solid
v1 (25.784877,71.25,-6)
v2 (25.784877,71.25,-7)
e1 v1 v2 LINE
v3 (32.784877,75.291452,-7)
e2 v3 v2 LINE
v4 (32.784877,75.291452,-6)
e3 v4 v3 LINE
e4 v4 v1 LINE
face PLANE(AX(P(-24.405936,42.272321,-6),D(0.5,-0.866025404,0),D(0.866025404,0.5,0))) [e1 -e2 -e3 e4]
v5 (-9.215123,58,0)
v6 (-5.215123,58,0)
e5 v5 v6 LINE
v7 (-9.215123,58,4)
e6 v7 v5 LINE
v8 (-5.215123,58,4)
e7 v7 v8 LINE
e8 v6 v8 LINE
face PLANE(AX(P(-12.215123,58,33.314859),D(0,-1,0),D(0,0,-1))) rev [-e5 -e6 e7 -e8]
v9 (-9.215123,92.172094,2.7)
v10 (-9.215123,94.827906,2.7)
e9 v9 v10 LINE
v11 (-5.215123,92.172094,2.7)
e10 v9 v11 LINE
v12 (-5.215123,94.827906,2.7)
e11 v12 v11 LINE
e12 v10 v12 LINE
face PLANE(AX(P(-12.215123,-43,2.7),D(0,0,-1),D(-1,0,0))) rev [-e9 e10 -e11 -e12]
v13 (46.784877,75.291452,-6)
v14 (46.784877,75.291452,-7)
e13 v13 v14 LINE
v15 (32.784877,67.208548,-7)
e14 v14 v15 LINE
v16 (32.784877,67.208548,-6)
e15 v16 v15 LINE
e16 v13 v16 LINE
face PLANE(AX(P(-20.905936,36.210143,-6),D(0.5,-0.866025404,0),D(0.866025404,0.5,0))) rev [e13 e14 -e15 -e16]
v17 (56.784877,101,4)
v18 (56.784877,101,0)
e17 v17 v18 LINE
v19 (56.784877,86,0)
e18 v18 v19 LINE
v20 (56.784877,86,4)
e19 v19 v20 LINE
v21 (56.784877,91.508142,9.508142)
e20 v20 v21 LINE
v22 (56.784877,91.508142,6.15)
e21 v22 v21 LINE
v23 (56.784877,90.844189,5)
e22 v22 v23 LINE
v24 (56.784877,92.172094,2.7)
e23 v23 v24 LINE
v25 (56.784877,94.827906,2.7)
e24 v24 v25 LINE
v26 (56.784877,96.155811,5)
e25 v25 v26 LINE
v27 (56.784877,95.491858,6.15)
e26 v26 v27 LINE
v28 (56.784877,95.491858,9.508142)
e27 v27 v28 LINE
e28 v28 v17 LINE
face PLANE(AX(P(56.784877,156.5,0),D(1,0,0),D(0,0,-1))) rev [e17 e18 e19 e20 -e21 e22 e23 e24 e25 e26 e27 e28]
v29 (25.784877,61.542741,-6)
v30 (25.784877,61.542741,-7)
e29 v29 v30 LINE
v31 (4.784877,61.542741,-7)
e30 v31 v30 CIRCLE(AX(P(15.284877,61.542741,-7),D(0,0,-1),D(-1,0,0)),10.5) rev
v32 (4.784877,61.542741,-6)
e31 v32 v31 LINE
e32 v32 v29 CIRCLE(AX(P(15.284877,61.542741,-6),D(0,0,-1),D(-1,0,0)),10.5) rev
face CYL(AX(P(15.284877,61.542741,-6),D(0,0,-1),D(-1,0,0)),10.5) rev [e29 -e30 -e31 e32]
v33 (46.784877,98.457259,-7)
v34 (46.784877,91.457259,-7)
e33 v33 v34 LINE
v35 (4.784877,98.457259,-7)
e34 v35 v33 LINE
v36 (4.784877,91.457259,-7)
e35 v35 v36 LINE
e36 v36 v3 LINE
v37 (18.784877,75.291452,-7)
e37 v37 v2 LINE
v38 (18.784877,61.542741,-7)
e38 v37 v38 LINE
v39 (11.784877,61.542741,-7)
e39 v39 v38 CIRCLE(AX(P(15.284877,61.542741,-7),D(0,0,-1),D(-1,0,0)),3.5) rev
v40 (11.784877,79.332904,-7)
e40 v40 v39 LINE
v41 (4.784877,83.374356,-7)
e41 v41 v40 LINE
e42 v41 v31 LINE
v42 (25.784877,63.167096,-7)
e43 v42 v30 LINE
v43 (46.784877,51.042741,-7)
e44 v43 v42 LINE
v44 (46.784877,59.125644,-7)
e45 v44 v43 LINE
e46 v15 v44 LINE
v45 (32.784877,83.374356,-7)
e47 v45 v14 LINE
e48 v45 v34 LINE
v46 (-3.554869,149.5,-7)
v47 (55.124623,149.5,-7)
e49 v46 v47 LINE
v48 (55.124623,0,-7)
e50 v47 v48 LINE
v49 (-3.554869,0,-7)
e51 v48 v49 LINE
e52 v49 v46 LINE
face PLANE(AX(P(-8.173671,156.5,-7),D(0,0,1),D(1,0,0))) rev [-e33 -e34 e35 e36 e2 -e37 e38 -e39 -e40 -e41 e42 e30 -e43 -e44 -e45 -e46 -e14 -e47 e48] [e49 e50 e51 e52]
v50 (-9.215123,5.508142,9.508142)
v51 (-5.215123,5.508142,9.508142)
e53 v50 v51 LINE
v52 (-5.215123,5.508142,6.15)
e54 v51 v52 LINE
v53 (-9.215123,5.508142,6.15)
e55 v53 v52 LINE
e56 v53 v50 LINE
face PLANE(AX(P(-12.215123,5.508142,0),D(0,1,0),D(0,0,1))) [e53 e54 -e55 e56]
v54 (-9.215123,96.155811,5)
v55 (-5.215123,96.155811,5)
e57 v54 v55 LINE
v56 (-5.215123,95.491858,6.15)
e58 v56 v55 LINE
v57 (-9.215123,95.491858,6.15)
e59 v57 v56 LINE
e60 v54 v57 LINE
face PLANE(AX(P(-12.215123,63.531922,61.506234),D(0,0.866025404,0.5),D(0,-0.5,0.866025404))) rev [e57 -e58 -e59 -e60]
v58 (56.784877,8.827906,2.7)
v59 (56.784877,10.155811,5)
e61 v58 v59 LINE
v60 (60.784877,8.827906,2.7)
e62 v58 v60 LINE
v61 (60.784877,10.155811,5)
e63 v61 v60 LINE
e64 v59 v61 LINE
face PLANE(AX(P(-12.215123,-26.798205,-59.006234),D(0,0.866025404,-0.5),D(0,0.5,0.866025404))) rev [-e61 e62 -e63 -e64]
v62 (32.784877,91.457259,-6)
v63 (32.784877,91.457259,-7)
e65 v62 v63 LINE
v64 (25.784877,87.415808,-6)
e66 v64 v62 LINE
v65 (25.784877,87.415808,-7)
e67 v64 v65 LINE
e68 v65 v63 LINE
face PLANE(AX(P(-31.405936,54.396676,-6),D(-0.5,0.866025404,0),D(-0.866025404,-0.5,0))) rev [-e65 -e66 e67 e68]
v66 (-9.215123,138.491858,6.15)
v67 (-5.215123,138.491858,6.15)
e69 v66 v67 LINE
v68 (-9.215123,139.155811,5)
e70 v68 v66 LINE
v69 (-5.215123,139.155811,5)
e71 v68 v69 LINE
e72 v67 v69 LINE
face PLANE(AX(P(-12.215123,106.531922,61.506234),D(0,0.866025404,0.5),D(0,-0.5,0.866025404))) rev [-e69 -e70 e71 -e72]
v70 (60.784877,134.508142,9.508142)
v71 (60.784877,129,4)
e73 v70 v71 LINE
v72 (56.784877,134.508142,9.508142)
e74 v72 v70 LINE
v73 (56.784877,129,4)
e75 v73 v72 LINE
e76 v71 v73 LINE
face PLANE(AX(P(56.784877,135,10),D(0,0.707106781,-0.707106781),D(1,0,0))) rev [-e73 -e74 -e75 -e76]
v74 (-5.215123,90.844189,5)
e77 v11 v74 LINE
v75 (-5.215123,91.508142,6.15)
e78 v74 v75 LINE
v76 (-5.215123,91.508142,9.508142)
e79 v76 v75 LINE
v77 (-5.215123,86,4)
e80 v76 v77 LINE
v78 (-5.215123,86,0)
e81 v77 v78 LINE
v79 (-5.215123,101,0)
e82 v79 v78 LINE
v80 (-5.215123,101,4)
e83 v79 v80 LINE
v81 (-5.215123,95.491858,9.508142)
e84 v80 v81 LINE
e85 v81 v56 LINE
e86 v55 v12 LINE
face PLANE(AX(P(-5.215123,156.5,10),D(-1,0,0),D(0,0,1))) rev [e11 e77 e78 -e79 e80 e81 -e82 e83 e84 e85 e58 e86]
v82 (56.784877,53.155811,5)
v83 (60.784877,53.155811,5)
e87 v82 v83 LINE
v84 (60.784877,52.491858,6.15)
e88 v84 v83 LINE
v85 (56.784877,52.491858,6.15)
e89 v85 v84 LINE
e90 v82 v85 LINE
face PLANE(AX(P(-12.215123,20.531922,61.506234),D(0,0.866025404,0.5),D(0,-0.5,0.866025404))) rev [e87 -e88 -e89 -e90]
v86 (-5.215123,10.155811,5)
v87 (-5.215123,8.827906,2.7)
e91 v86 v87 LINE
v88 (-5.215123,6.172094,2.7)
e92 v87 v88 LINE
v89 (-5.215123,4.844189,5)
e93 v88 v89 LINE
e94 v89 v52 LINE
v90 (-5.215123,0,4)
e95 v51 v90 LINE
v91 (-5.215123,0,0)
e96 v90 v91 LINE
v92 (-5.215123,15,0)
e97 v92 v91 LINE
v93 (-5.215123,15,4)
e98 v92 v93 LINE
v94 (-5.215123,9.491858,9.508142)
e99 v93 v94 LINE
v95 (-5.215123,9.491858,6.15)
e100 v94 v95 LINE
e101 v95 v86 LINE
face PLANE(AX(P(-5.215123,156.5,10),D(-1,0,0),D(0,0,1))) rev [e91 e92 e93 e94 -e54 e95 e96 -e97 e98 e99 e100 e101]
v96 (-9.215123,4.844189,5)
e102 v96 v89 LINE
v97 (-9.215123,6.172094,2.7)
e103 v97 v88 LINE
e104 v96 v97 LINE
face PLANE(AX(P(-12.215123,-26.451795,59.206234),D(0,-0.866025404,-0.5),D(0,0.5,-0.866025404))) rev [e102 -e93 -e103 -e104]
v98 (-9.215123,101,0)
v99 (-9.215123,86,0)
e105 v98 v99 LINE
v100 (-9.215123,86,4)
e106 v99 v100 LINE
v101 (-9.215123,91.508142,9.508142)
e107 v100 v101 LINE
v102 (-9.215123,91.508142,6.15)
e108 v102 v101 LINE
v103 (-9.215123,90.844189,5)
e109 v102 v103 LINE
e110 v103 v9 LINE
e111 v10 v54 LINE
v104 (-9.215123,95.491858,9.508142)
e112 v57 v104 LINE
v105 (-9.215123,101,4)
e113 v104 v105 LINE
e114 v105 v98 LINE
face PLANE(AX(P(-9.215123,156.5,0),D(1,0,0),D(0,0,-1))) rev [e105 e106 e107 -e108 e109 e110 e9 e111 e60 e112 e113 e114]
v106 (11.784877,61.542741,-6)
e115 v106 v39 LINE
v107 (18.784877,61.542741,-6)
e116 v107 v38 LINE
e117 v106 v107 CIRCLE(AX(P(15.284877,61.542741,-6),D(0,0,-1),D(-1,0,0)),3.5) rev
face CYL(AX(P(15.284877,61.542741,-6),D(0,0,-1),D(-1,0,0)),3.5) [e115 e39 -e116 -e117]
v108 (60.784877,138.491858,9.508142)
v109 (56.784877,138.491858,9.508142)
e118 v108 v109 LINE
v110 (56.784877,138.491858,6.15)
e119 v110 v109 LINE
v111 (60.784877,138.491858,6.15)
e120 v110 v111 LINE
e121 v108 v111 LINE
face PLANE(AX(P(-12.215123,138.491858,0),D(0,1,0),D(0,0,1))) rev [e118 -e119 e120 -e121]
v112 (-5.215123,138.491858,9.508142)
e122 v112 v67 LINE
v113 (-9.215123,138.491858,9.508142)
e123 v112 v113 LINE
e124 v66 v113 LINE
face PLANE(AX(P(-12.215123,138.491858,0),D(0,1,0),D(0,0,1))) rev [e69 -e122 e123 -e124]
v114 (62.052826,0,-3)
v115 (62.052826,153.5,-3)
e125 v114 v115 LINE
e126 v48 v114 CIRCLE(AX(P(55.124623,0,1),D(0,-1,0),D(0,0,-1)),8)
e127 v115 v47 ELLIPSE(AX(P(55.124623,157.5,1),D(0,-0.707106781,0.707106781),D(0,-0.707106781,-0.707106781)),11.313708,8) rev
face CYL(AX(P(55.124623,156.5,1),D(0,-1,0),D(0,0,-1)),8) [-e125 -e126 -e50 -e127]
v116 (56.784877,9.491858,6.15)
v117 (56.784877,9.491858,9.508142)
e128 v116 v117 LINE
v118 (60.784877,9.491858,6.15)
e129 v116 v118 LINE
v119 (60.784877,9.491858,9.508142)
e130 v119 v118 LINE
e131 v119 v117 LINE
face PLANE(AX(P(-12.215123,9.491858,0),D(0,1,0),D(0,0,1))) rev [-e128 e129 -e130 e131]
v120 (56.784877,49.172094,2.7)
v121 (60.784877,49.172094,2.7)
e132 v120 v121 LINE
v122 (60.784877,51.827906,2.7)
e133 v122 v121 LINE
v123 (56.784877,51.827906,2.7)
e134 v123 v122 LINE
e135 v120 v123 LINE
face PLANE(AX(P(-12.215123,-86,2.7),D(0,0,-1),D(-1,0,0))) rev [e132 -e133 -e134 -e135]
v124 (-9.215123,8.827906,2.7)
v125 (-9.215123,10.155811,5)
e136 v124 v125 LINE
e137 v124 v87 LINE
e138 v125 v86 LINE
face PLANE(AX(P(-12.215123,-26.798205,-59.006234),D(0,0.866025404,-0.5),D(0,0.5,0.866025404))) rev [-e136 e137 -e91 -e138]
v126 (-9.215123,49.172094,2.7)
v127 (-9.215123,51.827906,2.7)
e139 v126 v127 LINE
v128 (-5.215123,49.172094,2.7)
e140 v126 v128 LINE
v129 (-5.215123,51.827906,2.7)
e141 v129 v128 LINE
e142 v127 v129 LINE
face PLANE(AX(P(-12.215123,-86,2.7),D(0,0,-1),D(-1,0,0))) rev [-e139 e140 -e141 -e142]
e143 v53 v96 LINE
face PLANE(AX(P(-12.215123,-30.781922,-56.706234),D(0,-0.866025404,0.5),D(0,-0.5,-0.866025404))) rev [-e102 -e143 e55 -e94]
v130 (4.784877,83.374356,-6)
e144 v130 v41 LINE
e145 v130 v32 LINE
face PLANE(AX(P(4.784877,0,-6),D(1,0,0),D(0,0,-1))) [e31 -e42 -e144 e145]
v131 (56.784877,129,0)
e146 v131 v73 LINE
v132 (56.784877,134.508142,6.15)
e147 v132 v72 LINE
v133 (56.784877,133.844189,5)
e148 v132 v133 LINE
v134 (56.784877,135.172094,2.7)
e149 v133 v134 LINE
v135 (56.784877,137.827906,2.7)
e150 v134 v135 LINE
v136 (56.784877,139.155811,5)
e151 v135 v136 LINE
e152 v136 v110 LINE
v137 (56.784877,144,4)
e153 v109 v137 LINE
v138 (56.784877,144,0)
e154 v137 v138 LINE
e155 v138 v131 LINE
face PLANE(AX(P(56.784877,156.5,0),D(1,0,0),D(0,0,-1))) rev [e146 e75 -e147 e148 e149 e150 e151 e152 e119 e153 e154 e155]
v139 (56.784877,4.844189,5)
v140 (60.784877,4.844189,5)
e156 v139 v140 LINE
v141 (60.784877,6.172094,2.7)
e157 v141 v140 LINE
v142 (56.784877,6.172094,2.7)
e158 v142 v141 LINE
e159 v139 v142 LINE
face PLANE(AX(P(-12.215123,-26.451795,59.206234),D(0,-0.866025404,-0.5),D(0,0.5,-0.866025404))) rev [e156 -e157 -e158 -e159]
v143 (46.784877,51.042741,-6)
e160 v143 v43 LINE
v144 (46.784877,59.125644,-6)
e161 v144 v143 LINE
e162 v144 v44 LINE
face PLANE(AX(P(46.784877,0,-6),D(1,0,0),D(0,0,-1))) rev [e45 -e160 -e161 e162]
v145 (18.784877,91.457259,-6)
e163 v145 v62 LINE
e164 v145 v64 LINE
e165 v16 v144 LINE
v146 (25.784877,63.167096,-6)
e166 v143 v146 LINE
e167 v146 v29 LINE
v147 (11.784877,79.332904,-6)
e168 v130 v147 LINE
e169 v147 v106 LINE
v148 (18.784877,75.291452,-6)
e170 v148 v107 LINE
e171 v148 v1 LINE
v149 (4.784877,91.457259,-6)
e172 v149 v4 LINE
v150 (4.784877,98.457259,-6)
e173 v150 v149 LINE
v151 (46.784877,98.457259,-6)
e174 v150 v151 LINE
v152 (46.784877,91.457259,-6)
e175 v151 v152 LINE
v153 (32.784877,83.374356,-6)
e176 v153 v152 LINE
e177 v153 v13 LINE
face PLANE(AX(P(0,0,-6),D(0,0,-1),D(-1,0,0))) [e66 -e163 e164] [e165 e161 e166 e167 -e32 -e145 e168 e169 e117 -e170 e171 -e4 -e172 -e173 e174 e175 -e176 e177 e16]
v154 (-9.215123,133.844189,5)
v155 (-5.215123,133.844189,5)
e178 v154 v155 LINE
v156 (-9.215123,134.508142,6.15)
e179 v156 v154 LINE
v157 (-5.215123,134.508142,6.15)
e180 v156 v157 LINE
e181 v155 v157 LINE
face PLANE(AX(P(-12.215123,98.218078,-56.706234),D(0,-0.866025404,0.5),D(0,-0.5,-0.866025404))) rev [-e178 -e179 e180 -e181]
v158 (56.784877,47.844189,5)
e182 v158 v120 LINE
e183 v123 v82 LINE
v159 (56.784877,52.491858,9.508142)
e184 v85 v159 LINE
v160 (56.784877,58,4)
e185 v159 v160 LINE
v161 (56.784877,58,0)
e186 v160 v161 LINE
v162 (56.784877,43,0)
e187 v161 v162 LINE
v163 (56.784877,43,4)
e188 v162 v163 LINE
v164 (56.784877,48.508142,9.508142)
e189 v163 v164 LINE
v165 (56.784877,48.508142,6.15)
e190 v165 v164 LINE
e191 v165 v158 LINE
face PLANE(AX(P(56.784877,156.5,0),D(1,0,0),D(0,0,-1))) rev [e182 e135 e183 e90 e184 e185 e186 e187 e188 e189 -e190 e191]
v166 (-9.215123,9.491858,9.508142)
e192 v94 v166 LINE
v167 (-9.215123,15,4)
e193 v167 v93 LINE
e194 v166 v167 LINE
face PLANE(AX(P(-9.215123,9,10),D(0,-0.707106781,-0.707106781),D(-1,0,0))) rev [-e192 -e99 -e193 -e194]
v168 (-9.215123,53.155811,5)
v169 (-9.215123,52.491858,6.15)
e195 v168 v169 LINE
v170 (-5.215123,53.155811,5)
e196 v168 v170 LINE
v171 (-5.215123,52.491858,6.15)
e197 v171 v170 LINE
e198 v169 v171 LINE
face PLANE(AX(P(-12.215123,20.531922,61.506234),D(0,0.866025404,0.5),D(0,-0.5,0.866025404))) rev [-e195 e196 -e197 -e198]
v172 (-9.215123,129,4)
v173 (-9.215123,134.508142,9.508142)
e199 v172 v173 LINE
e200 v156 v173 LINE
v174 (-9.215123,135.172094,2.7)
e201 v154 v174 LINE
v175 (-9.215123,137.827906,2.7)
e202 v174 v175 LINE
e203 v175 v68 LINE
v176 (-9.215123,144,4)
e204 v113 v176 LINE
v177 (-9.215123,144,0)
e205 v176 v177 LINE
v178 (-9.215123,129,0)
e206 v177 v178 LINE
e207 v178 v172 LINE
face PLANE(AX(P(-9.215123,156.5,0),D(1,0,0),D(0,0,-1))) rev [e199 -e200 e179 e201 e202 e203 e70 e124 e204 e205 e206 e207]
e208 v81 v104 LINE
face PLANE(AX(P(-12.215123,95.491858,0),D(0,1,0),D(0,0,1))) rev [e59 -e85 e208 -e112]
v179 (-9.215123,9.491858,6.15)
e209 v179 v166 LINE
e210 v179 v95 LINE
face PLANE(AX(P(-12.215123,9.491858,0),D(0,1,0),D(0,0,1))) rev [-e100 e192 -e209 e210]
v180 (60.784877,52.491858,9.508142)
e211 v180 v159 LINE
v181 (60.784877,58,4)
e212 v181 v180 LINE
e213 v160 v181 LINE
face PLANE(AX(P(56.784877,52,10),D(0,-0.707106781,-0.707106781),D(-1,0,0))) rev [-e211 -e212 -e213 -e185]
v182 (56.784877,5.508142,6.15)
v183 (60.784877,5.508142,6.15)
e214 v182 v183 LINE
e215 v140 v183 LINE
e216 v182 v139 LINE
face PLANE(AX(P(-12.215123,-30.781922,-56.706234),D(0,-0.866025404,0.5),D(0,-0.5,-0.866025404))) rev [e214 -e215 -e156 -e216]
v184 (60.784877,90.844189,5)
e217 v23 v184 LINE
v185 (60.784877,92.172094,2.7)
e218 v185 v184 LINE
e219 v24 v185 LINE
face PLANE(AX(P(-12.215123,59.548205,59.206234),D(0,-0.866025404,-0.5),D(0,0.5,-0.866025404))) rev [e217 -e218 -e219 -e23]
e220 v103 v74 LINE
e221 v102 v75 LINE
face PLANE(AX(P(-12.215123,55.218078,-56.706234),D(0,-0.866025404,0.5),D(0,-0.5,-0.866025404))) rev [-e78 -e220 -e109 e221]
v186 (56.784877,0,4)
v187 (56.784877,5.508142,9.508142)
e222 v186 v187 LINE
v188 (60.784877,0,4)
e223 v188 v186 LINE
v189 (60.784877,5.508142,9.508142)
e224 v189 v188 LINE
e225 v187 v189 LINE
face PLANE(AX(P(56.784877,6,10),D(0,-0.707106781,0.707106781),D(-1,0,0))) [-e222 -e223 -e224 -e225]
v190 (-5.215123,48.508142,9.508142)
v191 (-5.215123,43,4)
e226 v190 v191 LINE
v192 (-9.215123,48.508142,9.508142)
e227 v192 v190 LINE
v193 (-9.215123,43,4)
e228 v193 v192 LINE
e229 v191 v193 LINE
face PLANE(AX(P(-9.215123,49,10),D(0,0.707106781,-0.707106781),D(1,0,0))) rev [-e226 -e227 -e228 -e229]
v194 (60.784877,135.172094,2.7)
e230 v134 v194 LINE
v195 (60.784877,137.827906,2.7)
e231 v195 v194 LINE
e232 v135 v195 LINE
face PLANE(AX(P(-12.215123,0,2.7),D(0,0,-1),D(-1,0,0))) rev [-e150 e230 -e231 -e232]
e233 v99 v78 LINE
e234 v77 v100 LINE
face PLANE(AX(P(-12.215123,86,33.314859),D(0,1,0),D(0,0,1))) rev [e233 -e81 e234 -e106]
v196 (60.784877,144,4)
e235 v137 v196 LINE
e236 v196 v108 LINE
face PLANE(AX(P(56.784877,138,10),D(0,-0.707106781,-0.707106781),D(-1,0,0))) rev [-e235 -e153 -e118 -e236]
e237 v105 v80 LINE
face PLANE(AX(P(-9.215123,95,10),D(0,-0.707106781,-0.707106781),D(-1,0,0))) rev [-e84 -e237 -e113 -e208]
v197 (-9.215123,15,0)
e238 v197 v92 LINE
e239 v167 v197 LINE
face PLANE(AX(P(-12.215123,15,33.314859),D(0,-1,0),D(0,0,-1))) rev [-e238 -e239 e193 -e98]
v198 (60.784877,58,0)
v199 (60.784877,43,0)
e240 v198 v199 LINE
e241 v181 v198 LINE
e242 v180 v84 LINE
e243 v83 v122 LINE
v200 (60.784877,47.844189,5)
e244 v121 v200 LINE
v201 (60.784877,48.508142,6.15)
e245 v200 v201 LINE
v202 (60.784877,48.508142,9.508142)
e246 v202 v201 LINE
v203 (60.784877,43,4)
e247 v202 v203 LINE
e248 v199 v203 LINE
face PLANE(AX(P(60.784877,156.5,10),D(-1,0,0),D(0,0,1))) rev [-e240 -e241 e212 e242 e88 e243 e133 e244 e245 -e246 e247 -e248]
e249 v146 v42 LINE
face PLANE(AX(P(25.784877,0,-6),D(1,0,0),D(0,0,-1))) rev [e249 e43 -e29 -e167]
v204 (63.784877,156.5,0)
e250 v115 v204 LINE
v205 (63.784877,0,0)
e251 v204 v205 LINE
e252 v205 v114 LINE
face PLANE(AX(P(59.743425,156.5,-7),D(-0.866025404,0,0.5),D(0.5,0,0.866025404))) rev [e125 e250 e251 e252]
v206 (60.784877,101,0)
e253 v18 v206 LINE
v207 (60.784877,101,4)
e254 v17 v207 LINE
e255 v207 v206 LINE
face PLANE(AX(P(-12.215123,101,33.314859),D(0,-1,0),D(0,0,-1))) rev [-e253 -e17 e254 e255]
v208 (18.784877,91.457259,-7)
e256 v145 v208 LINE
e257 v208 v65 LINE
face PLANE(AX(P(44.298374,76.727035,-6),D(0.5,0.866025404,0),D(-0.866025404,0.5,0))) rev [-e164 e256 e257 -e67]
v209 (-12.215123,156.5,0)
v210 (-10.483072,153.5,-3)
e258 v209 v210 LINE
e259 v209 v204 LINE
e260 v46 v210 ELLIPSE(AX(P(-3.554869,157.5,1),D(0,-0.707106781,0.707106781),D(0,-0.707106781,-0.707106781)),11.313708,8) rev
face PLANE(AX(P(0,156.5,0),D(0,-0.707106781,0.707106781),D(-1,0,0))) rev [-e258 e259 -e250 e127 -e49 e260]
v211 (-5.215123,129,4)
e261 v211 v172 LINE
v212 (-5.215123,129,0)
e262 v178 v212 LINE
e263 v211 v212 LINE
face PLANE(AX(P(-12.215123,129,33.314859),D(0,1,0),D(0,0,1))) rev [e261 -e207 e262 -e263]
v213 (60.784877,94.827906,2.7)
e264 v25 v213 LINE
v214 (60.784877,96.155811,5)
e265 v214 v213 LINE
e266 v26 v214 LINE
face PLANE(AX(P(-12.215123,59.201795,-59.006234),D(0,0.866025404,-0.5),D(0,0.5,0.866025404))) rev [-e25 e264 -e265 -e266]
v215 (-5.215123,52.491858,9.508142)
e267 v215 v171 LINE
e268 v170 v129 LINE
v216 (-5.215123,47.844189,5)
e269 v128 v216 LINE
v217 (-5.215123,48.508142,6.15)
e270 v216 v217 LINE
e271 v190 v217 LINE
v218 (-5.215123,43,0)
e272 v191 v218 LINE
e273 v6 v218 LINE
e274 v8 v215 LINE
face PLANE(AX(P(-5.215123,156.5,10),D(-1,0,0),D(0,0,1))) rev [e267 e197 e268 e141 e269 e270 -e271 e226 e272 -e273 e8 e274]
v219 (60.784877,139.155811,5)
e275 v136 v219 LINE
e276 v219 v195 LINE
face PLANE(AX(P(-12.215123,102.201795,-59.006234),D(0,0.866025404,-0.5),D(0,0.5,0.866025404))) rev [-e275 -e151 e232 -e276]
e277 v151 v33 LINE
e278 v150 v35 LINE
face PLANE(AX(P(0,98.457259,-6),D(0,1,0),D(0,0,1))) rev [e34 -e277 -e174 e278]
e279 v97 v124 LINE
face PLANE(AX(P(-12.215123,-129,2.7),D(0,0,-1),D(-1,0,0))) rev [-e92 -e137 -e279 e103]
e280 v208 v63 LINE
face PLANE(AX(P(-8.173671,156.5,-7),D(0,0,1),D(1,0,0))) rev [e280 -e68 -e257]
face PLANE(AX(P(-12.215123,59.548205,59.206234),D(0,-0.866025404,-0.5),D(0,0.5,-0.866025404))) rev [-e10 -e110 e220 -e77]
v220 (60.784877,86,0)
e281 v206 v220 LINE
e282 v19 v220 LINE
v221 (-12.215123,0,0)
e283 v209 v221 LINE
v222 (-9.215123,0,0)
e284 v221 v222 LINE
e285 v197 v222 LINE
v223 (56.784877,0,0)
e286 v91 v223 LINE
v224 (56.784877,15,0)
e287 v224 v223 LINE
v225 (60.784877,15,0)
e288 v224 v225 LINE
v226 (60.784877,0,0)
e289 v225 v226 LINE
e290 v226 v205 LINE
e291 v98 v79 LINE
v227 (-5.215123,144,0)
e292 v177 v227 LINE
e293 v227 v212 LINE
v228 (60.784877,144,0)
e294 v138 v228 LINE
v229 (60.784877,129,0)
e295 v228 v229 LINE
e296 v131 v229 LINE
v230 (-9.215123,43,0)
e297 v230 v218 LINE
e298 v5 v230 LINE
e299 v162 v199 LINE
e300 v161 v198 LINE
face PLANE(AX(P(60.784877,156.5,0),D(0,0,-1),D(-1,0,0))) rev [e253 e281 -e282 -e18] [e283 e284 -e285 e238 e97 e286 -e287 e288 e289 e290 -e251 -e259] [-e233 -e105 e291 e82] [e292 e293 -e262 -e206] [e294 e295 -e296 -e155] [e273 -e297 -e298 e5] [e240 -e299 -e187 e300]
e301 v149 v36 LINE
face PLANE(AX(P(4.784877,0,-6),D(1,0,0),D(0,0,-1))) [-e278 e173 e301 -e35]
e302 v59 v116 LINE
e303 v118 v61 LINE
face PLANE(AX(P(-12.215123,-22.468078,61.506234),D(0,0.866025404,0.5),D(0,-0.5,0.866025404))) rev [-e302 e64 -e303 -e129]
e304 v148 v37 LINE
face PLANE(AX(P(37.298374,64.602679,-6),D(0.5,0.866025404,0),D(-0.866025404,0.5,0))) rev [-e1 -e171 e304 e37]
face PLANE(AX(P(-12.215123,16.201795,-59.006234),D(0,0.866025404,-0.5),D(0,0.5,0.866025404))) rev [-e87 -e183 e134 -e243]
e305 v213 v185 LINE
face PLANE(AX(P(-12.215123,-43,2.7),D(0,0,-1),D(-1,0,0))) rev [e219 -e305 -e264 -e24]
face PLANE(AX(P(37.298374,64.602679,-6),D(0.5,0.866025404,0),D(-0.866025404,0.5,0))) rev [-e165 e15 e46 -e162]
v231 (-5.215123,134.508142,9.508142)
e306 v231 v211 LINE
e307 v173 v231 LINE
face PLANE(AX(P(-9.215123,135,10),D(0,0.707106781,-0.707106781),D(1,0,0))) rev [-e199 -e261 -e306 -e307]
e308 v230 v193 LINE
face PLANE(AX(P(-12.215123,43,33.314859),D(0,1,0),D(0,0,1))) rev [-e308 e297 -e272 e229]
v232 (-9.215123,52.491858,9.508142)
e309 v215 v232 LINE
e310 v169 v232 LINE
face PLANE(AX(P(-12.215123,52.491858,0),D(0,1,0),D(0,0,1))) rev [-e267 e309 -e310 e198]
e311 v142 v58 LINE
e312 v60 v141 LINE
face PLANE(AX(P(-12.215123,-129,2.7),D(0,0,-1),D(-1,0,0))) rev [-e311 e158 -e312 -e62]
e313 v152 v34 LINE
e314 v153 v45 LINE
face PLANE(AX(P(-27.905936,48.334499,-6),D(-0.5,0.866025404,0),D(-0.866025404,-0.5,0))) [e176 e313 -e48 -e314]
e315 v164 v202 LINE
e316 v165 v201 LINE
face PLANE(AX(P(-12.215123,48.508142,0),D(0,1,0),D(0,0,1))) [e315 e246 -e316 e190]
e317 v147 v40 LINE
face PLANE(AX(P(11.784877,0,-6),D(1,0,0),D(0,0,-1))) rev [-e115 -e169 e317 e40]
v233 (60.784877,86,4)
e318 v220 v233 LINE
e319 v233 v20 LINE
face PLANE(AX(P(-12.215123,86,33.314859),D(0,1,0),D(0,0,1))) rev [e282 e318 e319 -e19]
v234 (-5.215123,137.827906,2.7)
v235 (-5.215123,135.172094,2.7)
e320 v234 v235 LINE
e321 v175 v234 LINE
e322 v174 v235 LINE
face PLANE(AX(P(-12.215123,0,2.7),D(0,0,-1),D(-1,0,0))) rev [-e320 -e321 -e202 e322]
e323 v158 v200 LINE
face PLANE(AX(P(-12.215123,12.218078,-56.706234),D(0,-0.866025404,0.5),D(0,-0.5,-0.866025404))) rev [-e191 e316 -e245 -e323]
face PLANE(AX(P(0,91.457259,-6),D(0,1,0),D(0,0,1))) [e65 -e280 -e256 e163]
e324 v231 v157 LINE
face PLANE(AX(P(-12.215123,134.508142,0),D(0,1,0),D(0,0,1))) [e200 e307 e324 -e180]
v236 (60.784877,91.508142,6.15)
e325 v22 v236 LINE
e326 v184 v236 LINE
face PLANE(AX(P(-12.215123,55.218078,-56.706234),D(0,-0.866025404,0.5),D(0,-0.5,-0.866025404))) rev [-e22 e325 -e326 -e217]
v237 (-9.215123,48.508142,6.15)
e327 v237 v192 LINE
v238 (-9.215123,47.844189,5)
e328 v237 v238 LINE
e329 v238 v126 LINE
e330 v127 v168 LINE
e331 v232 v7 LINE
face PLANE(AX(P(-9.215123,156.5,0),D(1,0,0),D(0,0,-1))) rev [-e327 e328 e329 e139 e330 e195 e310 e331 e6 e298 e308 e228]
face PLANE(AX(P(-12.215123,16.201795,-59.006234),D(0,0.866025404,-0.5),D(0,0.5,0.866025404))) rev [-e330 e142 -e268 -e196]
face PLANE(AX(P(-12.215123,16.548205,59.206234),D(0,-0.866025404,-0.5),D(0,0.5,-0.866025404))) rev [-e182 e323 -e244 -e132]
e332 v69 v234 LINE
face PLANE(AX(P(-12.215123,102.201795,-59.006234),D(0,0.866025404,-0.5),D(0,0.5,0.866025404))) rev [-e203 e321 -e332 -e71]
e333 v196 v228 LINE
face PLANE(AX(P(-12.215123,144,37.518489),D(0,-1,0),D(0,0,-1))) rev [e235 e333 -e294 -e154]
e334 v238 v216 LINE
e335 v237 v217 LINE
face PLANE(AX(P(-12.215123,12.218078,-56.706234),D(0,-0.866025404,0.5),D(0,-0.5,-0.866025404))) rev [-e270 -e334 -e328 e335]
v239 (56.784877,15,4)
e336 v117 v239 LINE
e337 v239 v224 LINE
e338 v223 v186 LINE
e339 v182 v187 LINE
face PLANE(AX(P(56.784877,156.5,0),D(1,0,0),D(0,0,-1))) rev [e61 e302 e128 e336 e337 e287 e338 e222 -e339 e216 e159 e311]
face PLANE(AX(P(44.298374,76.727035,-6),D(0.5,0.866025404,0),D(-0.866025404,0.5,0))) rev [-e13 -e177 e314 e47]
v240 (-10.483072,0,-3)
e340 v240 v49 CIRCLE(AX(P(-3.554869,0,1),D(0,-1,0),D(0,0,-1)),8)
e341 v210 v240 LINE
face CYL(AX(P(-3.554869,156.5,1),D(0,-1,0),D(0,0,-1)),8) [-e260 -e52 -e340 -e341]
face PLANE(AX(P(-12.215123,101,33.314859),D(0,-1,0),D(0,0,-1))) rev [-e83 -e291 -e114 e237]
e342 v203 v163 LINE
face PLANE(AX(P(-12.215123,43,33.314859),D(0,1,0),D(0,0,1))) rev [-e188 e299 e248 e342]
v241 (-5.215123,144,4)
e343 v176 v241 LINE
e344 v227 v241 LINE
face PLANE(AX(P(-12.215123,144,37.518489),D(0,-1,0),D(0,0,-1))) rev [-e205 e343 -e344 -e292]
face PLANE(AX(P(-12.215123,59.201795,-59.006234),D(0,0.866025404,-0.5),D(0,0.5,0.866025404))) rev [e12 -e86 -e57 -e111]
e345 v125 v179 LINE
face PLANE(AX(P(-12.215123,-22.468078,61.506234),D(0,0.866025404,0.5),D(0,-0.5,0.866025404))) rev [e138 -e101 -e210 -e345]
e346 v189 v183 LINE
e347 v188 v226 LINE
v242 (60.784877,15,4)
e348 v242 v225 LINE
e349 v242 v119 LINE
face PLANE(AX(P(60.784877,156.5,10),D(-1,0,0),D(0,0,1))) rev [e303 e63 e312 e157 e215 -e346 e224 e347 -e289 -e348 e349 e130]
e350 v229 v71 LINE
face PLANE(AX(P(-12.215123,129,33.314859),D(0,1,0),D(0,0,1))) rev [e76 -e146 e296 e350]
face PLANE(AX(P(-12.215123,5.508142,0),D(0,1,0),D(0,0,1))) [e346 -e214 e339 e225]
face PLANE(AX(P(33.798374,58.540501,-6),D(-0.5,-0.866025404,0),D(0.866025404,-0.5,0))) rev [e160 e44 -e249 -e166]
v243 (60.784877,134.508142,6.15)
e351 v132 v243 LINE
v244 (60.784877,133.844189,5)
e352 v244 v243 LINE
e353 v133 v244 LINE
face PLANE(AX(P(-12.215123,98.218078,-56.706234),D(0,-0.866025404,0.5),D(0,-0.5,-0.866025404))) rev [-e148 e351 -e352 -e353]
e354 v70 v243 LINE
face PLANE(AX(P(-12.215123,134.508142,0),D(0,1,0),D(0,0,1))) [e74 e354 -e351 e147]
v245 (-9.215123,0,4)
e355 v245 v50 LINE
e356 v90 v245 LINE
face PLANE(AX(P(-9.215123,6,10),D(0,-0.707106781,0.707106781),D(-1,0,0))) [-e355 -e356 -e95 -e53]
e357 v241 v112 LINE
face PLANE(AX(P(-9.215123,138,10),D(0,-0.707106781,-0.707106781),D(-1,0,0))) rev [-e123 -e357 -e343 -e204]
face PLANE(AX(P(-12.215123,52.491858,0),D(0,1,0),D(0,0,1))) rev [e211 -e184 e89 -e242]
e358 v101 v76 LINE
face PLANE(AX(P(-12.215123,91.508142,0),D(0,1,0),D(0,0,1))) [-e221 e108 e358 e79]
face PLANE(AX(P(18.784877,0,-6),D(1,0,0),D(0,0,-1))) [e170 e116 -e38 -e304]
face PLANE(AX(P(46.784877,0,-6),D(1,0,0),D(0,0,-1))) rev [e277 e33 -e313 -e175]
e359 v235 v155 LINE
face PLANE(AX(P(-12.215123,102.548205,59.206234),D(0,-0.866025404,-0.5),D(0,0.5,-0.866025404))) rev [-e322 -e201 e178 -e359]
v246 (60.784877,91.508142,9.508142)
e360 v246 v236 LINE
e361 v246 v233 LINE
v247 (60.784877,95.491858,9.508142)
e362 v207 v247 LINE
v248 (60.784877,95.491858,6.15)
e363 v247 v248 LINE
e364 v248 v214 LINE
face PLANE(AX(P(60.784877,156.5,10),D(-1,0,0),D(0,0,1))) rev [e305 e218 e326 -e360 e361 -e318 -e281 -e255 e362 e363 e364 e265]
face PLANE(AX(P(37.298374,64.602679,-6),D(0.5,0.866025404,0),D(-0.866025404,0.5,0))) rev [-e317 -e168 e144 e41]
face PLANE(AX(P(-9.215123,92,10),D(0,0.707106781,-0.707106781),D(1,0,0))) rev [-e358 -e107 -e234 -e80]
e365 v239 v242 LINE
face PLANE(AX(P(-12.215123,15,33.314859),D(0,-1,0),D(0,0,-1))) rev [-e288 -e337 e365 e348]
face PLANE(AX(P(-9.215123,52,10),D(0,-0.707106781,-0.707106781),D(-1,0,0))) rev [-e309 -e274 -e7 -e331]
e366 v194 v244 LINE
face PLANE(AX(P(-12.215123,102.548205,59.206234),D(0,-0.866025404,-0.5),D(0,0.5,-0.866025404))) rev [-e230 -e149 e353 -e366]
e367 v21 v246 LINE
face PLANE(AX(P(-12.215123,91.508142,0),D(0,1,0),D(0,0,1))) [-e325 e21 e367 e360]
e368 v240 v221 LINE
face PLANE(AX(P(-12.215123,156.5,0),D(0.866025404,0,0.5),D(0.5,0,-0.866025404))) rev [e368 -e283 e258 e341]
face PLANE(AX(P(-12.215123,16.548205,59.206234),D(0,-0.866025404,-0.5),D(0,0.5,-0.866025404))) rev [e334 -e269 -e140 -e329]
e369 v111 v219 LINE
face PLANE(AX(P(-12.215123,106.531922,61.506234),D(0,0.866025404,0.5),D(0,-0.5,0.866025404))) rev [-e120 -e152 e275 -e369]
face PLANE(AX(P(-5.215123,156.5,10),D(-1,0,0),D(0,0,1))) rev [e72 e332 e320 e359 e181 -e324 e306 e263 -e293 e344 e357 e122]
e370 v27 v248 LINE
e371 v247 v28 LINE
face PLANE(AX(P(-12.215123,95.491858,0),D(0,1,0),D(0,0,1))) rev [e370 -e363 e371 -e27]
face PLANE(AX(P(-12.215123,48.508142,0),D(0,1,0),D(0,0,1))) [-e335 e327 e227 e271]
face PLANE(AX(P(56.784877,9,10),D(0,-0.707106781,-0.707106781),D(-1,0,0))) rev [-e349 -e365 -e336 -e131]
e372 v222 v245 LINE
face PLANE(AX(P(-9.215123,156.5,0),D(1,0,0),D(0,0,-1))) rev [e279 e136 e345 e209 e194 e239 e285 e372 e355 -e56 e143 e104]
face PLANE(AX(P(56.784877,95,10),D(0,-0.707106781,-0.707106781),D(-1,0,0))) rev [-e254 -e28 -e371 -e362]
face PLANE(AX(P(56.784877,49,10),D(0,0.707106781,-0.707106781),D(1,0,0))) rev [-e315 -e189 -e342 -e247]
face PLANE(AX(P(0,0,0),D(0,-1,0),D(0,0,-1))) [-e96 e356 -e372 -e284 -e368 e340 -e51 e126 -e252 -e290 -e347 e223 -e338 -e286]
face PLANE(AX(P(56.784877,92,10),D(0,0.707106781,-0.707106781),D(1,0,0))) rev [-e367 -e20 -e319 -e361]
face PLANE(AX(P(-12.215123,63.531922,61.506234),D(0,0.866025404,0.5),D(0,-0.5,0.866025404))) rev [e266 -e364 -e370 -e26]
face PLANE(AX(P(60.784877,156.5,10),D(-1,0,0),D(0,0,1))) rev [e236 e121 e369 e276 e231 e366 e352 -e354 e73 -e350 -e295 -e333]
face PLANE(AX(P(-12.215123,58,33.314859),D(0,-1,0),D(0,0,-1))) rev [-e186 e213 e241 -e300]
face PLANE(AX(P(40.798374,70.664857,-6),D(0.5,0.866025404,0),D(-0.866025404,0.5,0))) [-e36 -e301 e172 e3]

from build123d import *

# Parameters (mm, degrees)
BOSS_EXTRUDE1_DEPTH = 156.5
SKETCH4_W           = 37.518488727
SKETCH4_H           = 12.5
CUT_EXTRUDE1_DEPTH  = 173.977599706
SKETCH5_W           = 33.314858612
SKETCH5_H           = 28
CUT_EXTRUDE2_DEPTH  = 173.977599706
CUT_EXTRUDE3_DEPTH  = 170.294892232
LPATTERN1_COUNT     = 4
LPATTERN1_PITCH     = 43
CHAMFER3_SIZE       = 7
FILLET1_R           = 8
CHAMFER5_SIZE       = 6
SKETCH7_W           = 42
SKETCH7_H           = 7
CUT_EXTRUDE4_DEPTH  = 1


# Some blends are built 0.0001 mm under size
with BuildPart() as part:
    # Sketch1 → Boss-Extrude1 (new body)
    with BuildSketch(Plane(origin=(0, 0, 0), x_dir=(1, 0, 0), z_dir=(0, 1, 0))):
        Polygon((-9.215122984, 0), (-9.215122984, -10), (-5.215122984, -10), (-5.215122984, 0), (56.784877016, 0), (56.784877016, -10), (60.784877016, -10), (60.784877016, 0), (63.784877016, 0), (59.743425131, 7), (-8.1736711, 7), (-12.215122984, 0), align=None)
    extrude(amount=BOSS_EXTRUDE1_DEPTH)

    # Sketch4 → Cut-Extrude1 (cut, through all)
    with BuildSketch(Plane(origin=(60.784877016, 0, 0), x_dir=(0, 0, -1), z_dir=(1, 0, 0))):
        with Locations((-18.759244364, 150.25)):
            Rectangle(SKETCH4_W, SKETCH4_H)
    extrude(amount=-CUT_EXTRUDE1_DEPTH, mode=Mode.SUBTRACT)

    # Sketch5 → Cut-Extrude2 (cut, through all)
    with BuildSketch(Plane(origin=(60.784877016, 0, 0), x_dir=(0, 0, -1), z_dir=(1, 0, 0))):
        with Locations((-16.657429306, 115)):
            Rectangle(SKETCH5_W, SKETCH5_H)
    cut_extrude2 = extrude(amount=-CUT_EXTRUDE2_DEPTH, mode=Mode.SUBTRACT)

    # Sketch6 → Cut-Extrude3 (cut, symmetric)
    with BuildSketch(Plane(origin=(0, 0, 0), x_dir=(0, 0, -1), z_dir=(1, 0, 0))):
        Polygon((-7.3, 137.827905619), (-6.15, 138.491858429), (-10, 138.491858429), (-10, 134.508141571), (-6.15, 134.508141571), (-7.3, 135.172094381), align=None)
        Polygon((-5, 133.844188762), (-2.7, 135.172094381), (-2.7, 137.827905619), (-5, 139.155811238), (-7.3, 137.827905619), (-7.3, 135.172094381), align=None)
    cut_extrude3 = extrude(amount=CUT_EXTRUDE3_DEPTH, both=True, mode=Mode.SUBTRACT)

    # LPattern1: Cut-Extrude2, Cut-Extrude3 ×4
    with Locations(*[(0, -i * LPATTERN1_PITCH, 0) for i in range(1, LPATTERN1_COUNT)]):
        add(cut_extrude2, mode=Mode.SUBTRACT)
        add(cut_extrude3, mode=Mode.SUBTRACT)

    # Chamfer3
    chamfer3_edges = [part.edges().sort_by_distance(p)[0] for p in [
        (25.784877016, 156.5, -7),
    ]]
    chamfer(chamfer3_edges, length=CHAMFER3_SIZE - 0.0001)  # a hair under: the kernel refuses the full size

    # Fillet1
    fillet1_edges = [part.edges().sort_by_distance(p)[0] for p in [
        (-8.1736711, 74.75005, -7),
        (59.743425131, 74.75005, -7),
    ]]
    fillet(fillet1_edges, radius=FILLET1_R)

    # Chamfer5
    # the kernel refuses this chamfer: 6 mm, written as the material it takes off along each edge
    with BuildSketch(Plane(origin=(76.214974943, 43, 10), x_dir=(0, -0.027495876610586778, -0.9996219169112968), z_dir=(-1, 0, 0)), Plane(origin=(41.354779088, 144, 10), x_dir=(0, 0.027495876610586778, -0.9996219169112968), z_dir=(1, 0, 0)), Plane(origin=(76.214974943, 129, 10), x_dir=(0, -0.027495876610586778, -0.9996219169112968), z_dir=(-1, 0, 0)), Plane(origin=(-24.645220912, 144, 10), x_dir=(0, 0.027495876610586775, -0.9996219169112968), z_dir=(1, 0, 0)), Plane(origin=(10.214974943, 129, 10), x_dir=(0, -0.027495876610586778, -0.9996219169112968), z_dir=(-1, 0, 0)), Plane(origin=(-24.645220912, 101, 10), x_dir=(0, 0.027495876610586775, -0.9996219169112968), z_dir=(1, 0, 0)), Plane(origin=(10.214974943, 86, 10), x_dir=(0, -0.027495876610586778, -0.9996219169112968), z_dir=(-1, 0, 0)), Plane(origin=(41.354779088, 101, 10), x_dir=(0, 0.027495876610586778, -0.9996219169112968), z_dir=(1, 0, 0)), Plane(origin=(76.214974943, 86, 10), x_dir=(0, -0.027495876610586778, -0.9996219169112968), z_dir=(-1, 0, 0)), Plane(origin=(41.354779088, 58, 10), x_dir=(0, 0.027495876610586778, -0.9996219169112968), z_dir=(1, 0, 0)), Plane(origin=(41.354779088, 15, 10), x_dir=(0, 0.02749587661058649, -0.9996219169112968), z_dir=(1, 0, 0)), Plane(origin=(-24.645220912, 15, 10), x_dir=(0, 0.027495876610586487, -0.9996219169112968), z_dir=(1, 0, 0)), Plane(origin=(-24.645220912, 58, 10), x_dir=(0, 0.027495876610586775, -0.9996219169112968), z_dir=(1, 0, 0)), Plane(origin=(10.214974943, 43, 10), x_dir=(0, -0.027495876610586778, -0.9996219169112968), z_dir=(-1, 0, 0))) as chamfer5_piece_1:
        Polygon((CHAMFER5_SIZE * 0.999621916911, -CHAMFER5_SIZE * 0.0274958766106), (-CHAMFER5_SIZE * 0.0274958766106, -CHAMFER5_SIZE * 0.999621916911), (0, 0), align=None)
    extrude(amount=34.860195856, mode=Mode.SUBTRACT)
    with BuildSketch(Plane(origin=(41.354779088, 0, 10), x_dir=(0, -0.027495876610586372, -0.9996219169112968), z_dir=(1, 0, 0)), Plane(origin=(-24.645220912, 0, 10), x_dir=(0, -0.027495876610586372, -0.9996219169112968), z_dir=(1, 0, 0))) as chamfer5_piece_2:
        Polygon((CHAMFER5_SIZE * 0.999621916911, CHAMFER5_SIZE * 0.0274958766106), (-CHAMFER5_SIZE * 0.0274958766106, CHAMFER5_SIZE * 0.999621916911), (0, 0), align=None)
    extrude(amount=34.860195856, mode=Mode.SUBTRACT)

    # Sketch7 → Cut-Extrude4 (cut)
    with BuildSketch(Plane(origin=(0, 0, -7), x_dir=(-1, 0, 0), z_dir=(0, 0, -1))):
        with Locations((-25.784877016, 94.957259422)):
            Rectangle(SKETCH7_W, SKETCH7_H)
        Polygon((-25.784877016, 79.332903769), (-4.784877016, 91.457259422), (-18.784877016, 91.457259422), (-25.784877016, 87.415807537), (-32.784877016, 91.457259422), (-46.784877016, 91.457259422), (-32.784877016, 83.374355653), align=None)
        Polygon((-32.784877016, 75.291451884), (-25.784877016, 79.332903769), (-32.784877016, 83.374355653), (-46.784877016, 75.291451884), (-32.784877016, 67.208548116), (-25.784877016, 71.25), align=None)
        with BuildLine():
            Line((-18.784877016, 75.291451884), (-25.784877016, 71.25))
            Line((-25.784877016, 71.25), (-32.784877016, 67.208548116))
            Line((-32.784877016, 67.208548116), (-46.784877016, 59.125644347))
            Line((-46.784877016, 59.125644347), (-46.784877016, 51.042740578))
            Line((-46.784877016, 51.042740578), (-25.784877016, 63.167096231))
            Line((-25.784877016, 63.167096231), (-25.784877016, 61.542740578))
            ThreePointArc((-25.784877016, 61.542740578), (-15.284877016, 51.042740578), (-4.784877016, 61.542740578))
            Line((-4.784877016, 61.542740578), (-4.784877016, 83.374355653))
            Line((-4.784877016, 83.374355653), (-11.784877016, 79.332903769))
            Line((-11.784877016, 79.332903769), (-11.784877016, 61.542740578))
            ThreePointArc((-11.784877016, 61.542740578), (-15.284877016, 58.042740578), (-18.784877016, 61.542740578))
            Line((-18.784877016, 61.542740578), (-18.784877016, 75.291451884))
        make_face()
    extrude(amount=-CUT_EXTRUDE4_DEPTH, mode=Mode.SUBTRACT)


solid = part.part
